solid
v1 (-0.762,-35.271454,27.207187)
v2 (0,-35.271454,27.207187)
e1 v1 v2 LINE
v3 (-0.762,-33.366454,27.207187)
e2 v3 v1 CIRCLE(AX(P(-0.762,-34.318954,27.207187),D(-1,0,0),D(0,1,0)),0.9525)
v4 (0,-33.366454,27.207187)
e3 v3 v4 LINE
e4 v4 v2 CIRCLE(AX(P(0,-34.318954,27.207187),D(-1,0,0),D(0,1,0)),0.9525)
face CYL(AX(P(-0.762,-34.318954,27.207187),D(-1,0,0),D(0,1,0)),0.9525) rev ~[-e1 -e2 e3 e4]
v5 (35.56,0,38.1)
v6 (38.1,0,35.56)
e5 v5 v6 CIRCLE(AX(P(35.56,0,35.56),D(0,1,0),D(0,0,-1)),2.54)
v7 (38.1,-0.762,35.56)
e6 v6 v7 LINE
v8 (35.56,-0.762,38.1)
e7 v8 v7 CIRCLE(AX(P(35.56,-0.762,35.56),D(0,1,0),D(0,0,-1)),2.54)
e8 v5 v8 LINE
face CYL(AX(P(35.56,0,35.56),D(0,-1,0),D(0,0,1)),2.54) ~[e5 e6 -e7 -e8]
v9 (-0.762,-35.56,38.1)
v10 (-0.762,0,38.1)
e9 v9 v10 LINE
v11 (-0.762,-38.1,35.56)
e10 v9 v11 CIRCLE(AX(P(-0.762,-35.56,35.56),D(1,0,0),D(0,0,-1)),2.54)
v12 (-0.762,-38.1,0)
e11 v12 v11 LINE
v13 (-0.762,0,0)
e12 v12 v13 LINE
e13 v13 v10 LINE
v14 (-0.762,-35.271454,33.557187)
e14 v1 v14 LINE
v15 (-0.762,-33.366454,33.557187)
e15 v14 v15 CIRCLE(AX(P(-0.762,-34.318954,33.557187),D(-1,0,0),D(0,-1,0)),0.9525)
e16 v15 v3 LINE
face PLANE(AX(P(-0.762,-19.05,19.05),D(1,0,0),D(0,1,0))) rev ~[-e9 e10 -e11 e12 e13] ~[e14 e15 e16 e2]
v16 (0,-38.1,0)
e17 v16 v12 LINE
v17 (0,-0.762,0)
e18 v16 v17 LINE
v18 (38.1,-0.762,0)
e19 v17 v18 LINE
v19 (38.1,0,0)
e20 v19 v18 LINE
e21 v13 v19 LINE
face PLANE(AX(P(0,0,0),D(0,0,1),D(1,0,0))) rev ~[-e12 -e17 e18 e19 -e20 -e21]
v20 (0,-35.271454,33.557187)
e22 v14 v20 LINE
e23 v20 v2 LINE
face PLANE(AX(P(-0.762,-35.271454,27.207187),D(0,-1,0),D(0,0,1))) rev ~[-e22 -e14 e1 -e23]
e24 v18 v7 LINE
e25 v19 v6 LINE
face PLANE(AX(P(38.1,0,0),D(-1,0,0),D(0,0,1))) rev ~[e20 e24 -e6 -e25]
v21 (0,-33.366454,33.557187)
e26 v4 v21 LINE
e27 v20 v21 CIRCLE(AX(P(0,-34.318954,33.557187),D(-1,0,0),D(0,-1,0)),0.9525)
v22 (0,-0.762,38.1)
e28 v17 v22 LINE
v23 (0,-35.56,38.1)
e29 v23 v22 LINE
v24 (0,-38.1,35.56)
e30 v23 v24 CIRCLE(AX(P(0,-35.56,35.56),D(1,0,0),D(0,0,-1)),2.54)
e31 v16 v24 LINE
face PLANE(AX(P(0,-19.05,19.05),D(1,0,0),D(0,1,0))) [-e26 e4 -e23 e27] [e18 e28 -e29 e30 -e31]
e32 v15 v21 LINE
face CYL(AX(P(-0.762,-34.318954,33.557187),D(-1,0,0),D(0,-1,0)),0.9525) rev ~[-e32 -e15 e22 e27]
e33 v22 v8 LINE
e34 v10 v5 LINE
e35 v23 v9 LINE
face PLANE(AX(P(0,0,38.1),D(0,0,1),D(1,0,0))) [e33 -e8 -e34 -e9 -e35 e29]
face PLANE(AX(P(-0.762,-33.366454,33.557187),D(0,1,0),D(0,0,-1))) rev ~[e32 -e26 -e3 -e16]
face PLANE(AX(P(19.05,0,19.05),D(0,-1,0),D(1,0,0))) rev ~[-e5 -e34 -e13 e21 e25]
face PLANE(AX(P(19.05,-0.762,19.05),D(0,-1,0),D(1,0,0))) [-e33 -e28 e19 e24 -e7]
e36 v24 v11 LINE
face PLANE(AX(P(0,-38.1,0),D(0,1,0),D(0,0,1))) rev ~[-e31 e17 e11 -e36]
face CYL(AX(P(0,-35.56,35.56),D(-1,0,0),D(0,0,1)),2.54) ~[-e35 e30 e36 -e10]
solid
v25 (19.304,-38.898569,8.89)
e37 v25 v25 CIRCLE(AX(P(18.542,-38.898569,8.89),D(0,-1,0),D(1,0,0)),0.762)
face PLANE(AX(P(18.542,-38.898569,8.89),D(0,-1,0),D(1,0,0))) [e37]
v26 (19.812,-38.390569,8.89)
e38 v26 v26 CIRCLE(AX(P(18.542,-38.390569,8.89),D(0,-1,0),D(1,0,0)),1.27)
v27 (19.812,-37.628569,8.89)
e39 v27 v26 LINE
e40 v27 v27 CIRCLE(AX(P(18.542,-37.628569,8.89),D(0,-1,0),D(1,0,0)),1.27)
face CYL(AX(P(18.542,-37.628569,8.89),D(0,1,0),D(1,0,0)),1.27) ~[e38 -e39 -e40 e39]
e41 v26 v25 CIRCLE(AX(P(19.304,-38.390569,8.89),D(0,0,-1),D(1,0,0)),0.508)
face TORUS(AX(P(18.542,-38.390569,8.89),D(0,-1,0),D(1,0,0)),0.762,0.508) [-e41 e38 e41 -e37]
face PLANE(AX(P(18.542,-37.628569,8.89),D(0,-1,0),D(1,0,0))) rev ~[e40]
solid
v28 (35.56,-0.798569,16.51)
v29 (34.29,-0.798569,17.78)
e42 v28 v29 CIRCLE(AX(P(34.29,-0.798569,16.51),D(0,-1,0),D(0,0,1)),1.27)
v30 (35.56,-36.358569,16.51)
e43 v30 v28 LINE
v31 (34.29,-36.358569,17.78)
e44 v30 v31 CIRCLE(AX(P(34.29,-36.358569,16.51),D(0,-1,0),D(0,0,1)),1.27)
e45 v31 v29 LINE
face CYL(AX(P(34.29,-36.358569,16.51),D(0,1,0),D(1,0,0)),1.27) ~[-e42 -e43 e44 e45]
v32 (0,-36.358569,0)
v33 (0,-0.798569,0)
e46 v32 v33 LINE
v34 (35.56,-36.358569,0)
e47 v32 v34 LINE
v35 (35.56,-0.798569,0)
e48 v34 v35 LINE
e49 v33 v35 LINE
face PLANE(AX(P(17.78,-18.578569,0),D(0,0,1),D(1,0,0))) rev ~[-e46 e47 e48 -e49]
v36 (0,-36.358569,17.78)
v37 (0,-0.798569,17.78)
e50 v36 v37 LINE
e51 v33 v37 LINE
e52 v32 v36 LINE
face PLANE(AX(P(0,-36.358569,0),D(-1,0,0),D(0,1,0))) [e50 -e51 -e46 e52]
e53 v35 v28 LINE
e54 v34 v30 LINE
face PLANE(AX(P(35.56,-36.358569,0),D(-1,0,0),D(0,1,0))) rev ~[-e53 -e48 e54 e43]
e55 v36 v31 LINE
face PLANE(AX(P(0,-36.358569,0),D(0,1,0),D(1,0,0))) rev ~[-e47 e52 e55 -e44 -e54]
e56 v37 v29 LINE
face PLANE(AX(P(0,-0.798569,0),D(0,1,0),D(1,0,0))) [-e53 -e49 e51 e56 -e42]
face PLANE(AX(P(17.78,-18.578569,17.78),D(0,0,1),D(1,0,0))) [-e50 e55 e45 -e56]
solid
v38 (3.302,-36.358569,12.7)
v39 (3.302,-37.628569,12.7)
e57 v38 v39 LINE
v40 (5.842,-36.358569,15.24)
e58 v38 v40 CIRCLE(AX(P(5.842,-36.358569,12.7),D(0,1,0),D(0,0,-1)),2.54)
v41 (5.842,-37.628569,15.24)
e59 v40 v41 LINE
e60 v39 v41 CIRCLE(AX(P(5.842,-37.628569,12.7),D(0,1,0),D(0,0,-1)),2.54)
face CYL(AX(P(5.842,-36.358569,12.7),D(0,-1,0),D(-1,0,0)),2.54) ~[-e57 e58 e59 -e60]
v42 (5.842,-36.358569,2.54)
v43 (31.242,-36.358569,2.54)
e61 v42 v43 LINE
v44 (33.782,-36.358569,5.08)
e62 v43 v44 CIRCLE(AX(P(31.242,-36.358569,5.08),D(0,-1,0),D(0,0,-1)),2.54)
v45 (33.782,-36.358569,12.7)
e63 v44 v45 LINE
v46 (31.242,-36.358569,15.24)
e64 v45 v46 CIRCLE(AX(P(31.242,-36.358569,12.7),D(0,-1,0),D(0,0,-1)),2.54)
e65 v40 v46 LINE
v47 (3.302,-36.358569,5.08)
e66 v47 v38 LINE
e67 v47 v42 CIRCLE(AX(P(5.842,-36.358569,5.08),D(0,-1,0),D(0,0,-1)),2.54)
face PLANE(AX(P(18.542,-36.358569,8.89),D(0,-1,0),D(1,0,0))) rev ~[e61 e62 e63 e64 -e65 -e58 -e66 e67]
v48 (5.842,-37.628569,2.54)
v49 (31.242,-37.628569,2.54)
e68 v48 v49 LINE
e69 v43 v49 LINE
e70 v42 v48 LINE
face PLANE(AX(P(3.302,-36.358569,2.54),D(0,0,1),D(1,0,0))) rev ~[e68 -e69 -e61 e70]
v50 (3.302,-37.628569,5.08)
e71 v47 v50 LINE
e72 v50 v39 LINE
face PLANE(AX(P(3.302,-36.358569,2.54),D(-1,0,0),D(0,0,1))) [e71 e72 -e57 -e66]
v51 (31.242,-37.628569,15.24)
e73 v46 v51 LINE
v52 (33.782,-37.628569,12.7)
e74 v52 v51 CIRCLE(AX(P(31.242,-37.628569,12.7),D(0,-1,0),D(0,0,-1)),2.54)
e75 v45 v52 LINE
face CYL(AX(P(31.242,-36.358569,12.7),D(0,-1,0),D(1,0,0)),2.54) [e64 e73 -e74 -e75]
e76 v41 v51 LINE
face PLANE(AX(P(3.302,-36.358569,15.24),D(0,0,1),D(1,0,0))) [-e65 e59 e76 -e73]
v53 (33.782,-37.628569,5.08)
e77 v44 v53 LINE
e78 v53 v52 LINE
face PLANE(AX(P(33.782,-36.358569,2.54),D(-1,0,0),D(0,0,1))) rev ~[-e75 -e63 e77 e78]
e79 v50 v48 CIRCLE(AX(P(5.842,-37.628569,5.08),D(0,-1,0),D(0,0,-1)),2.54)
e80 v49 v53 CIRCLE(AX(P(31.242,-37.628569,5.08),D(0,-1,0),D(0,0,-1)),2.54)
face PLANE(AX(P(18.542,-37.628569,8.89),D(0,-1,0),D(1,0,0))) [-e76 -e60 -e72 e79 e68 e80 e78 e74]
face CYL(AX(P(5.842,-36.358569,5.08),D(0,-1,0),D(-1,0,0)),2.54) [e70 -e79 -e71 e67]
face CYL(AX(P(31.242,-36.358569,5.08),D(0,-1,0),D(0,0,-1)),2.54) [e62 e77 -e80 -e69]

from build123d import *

# Parameters (mm, degrees)
F0_W      = 38.1
F0_H      = 38.1
F2_DEPTH  = 0.762
F1_W      = 38.1
F1_H      = 38.1
F3_DEPTH  = 0.762
F4_W      = 35.56
F4_H      = 35.56
F5_DEPTH  = 17.78
F6_W      = 30.48
F6_H      = 12.7
F7_DEPTH  = 1.27
F8_R      = 1.27
F9_DEPTH  = 1.27
F10_R     = 2.54
F11_R     = 1.27
F13_DEPTH = 25.4
F14_R     = 0.508
F15_R     = 2.54
F16_R     = 2.54


with BuildPart() as f2:
    # F0 (on Right) → F2 (new body)
    with BuildSketch(Plane.YZ):
        with Locations((-19.05, 19.05)):
            Rectangle(F0_W, F0_H)
    extrude(amount=-F2_DEPTH)

    # F1 (on Front) → F3 (join)
    with BuildSketch(Plane.XZ):
        with Locations((19.05, 19.05)):
            Rectangle(F1_W, F1_H)
    extrude(amount=F3_DEPTH)

    # F10
    f10_edges = [f2.edges().sort_by_distance(p)[0] for p in [
        (-0.381, -38.1, 38.1),
    ]]
    fillet(f10_edges, radius=F10_R)

    # F12 (on face) → F13 (cut)
    with BuildSketch(Plane(origin=(-0.762, 0, 0), x_dir=(0, -1, 0), z_dir=(-1, 0, 0))):
        with BuildLine():
            ThreePointArc((35.2714537645, 33.5571871057), (34.3189537645, 34.5096871057), (33.3664537645, 33.5571871057))
            Line((33.3664537645, 33.5571871057), (33.3664537645, 27.2071871057))
            ThreePointArc((33.3664537645, 27.2071871057), (34.3189537645, 26.2546871057), (35.2714537645, 27.2071871057))
            Line((35.2714537645, 27.2071871057), (35.2714537645, 33.5571871057))
        make_face()
    extrude(amount=-F13_DEPTH, mode=Mode.SUBTRACT)

    # F16
    f16_edges = [f2.edges().sort_by_distance(p)[0] for p in [
        (38.1, -0.381, 38.1),
    ]]
    fillet(f16_edges, radius=F16_R)


with BuildPart() as f5:
    # F4 (on Top) → F5 (new body)
    with BuildSketch(Plane.XY):
        with Locations((17.78, -18.5785688174)):
            Rectangle(F4_W, F4_H)
    extrude(amount=F5_DEPTH)

    # F11
    f11_edges = [f5.edges().sort_by_distance(p)[0] for p in [
        (35.56, -18.578569, 17.78),
    ]]
    fillet(f11_edges, radius=F11_R)


with BuildPart() as f7:
    # F6 (on face) → F7 (new body)
    with BuildSketch(Plane.XZ.offset(36.3585688174)):
        with Locations((18.542, 8.89)):
            Rectangle(F6_W, F6_H)
    extrude(amount=F7_DEPTH)

    # F15
    f15_edges = [f7.edges().sort_by_distance(p)[0] for p in [
        (3.302, -36.993569, 15.24),
        (3.302, -36.993569, 2.54),
        (33.782, -36.993569, 2.54),
        (33.782, -36.993569, 15.24),
    ]]
    fillet(f15_edges, radius=F15_R)


with BuildPart() as f9:
    # F8 (on face) → F9 (new body)
    with BuildSketch(Plane.XZ.offset(37.6285688174)):
        with Locations((18.542, 8.89)):
            Circle(F8_R)
    extrude(amount=F9_DEPTH)

    # F14
    f14_edges = [f9.edges().sort_by_distance(p)[0] for p in [
        (17.272, -38.898569, 8.89),
    ]]
    fillet(f14_edges, radius=F14_R)


solid = Compound([f2.part, f5.part, f7.part, f9.part])
